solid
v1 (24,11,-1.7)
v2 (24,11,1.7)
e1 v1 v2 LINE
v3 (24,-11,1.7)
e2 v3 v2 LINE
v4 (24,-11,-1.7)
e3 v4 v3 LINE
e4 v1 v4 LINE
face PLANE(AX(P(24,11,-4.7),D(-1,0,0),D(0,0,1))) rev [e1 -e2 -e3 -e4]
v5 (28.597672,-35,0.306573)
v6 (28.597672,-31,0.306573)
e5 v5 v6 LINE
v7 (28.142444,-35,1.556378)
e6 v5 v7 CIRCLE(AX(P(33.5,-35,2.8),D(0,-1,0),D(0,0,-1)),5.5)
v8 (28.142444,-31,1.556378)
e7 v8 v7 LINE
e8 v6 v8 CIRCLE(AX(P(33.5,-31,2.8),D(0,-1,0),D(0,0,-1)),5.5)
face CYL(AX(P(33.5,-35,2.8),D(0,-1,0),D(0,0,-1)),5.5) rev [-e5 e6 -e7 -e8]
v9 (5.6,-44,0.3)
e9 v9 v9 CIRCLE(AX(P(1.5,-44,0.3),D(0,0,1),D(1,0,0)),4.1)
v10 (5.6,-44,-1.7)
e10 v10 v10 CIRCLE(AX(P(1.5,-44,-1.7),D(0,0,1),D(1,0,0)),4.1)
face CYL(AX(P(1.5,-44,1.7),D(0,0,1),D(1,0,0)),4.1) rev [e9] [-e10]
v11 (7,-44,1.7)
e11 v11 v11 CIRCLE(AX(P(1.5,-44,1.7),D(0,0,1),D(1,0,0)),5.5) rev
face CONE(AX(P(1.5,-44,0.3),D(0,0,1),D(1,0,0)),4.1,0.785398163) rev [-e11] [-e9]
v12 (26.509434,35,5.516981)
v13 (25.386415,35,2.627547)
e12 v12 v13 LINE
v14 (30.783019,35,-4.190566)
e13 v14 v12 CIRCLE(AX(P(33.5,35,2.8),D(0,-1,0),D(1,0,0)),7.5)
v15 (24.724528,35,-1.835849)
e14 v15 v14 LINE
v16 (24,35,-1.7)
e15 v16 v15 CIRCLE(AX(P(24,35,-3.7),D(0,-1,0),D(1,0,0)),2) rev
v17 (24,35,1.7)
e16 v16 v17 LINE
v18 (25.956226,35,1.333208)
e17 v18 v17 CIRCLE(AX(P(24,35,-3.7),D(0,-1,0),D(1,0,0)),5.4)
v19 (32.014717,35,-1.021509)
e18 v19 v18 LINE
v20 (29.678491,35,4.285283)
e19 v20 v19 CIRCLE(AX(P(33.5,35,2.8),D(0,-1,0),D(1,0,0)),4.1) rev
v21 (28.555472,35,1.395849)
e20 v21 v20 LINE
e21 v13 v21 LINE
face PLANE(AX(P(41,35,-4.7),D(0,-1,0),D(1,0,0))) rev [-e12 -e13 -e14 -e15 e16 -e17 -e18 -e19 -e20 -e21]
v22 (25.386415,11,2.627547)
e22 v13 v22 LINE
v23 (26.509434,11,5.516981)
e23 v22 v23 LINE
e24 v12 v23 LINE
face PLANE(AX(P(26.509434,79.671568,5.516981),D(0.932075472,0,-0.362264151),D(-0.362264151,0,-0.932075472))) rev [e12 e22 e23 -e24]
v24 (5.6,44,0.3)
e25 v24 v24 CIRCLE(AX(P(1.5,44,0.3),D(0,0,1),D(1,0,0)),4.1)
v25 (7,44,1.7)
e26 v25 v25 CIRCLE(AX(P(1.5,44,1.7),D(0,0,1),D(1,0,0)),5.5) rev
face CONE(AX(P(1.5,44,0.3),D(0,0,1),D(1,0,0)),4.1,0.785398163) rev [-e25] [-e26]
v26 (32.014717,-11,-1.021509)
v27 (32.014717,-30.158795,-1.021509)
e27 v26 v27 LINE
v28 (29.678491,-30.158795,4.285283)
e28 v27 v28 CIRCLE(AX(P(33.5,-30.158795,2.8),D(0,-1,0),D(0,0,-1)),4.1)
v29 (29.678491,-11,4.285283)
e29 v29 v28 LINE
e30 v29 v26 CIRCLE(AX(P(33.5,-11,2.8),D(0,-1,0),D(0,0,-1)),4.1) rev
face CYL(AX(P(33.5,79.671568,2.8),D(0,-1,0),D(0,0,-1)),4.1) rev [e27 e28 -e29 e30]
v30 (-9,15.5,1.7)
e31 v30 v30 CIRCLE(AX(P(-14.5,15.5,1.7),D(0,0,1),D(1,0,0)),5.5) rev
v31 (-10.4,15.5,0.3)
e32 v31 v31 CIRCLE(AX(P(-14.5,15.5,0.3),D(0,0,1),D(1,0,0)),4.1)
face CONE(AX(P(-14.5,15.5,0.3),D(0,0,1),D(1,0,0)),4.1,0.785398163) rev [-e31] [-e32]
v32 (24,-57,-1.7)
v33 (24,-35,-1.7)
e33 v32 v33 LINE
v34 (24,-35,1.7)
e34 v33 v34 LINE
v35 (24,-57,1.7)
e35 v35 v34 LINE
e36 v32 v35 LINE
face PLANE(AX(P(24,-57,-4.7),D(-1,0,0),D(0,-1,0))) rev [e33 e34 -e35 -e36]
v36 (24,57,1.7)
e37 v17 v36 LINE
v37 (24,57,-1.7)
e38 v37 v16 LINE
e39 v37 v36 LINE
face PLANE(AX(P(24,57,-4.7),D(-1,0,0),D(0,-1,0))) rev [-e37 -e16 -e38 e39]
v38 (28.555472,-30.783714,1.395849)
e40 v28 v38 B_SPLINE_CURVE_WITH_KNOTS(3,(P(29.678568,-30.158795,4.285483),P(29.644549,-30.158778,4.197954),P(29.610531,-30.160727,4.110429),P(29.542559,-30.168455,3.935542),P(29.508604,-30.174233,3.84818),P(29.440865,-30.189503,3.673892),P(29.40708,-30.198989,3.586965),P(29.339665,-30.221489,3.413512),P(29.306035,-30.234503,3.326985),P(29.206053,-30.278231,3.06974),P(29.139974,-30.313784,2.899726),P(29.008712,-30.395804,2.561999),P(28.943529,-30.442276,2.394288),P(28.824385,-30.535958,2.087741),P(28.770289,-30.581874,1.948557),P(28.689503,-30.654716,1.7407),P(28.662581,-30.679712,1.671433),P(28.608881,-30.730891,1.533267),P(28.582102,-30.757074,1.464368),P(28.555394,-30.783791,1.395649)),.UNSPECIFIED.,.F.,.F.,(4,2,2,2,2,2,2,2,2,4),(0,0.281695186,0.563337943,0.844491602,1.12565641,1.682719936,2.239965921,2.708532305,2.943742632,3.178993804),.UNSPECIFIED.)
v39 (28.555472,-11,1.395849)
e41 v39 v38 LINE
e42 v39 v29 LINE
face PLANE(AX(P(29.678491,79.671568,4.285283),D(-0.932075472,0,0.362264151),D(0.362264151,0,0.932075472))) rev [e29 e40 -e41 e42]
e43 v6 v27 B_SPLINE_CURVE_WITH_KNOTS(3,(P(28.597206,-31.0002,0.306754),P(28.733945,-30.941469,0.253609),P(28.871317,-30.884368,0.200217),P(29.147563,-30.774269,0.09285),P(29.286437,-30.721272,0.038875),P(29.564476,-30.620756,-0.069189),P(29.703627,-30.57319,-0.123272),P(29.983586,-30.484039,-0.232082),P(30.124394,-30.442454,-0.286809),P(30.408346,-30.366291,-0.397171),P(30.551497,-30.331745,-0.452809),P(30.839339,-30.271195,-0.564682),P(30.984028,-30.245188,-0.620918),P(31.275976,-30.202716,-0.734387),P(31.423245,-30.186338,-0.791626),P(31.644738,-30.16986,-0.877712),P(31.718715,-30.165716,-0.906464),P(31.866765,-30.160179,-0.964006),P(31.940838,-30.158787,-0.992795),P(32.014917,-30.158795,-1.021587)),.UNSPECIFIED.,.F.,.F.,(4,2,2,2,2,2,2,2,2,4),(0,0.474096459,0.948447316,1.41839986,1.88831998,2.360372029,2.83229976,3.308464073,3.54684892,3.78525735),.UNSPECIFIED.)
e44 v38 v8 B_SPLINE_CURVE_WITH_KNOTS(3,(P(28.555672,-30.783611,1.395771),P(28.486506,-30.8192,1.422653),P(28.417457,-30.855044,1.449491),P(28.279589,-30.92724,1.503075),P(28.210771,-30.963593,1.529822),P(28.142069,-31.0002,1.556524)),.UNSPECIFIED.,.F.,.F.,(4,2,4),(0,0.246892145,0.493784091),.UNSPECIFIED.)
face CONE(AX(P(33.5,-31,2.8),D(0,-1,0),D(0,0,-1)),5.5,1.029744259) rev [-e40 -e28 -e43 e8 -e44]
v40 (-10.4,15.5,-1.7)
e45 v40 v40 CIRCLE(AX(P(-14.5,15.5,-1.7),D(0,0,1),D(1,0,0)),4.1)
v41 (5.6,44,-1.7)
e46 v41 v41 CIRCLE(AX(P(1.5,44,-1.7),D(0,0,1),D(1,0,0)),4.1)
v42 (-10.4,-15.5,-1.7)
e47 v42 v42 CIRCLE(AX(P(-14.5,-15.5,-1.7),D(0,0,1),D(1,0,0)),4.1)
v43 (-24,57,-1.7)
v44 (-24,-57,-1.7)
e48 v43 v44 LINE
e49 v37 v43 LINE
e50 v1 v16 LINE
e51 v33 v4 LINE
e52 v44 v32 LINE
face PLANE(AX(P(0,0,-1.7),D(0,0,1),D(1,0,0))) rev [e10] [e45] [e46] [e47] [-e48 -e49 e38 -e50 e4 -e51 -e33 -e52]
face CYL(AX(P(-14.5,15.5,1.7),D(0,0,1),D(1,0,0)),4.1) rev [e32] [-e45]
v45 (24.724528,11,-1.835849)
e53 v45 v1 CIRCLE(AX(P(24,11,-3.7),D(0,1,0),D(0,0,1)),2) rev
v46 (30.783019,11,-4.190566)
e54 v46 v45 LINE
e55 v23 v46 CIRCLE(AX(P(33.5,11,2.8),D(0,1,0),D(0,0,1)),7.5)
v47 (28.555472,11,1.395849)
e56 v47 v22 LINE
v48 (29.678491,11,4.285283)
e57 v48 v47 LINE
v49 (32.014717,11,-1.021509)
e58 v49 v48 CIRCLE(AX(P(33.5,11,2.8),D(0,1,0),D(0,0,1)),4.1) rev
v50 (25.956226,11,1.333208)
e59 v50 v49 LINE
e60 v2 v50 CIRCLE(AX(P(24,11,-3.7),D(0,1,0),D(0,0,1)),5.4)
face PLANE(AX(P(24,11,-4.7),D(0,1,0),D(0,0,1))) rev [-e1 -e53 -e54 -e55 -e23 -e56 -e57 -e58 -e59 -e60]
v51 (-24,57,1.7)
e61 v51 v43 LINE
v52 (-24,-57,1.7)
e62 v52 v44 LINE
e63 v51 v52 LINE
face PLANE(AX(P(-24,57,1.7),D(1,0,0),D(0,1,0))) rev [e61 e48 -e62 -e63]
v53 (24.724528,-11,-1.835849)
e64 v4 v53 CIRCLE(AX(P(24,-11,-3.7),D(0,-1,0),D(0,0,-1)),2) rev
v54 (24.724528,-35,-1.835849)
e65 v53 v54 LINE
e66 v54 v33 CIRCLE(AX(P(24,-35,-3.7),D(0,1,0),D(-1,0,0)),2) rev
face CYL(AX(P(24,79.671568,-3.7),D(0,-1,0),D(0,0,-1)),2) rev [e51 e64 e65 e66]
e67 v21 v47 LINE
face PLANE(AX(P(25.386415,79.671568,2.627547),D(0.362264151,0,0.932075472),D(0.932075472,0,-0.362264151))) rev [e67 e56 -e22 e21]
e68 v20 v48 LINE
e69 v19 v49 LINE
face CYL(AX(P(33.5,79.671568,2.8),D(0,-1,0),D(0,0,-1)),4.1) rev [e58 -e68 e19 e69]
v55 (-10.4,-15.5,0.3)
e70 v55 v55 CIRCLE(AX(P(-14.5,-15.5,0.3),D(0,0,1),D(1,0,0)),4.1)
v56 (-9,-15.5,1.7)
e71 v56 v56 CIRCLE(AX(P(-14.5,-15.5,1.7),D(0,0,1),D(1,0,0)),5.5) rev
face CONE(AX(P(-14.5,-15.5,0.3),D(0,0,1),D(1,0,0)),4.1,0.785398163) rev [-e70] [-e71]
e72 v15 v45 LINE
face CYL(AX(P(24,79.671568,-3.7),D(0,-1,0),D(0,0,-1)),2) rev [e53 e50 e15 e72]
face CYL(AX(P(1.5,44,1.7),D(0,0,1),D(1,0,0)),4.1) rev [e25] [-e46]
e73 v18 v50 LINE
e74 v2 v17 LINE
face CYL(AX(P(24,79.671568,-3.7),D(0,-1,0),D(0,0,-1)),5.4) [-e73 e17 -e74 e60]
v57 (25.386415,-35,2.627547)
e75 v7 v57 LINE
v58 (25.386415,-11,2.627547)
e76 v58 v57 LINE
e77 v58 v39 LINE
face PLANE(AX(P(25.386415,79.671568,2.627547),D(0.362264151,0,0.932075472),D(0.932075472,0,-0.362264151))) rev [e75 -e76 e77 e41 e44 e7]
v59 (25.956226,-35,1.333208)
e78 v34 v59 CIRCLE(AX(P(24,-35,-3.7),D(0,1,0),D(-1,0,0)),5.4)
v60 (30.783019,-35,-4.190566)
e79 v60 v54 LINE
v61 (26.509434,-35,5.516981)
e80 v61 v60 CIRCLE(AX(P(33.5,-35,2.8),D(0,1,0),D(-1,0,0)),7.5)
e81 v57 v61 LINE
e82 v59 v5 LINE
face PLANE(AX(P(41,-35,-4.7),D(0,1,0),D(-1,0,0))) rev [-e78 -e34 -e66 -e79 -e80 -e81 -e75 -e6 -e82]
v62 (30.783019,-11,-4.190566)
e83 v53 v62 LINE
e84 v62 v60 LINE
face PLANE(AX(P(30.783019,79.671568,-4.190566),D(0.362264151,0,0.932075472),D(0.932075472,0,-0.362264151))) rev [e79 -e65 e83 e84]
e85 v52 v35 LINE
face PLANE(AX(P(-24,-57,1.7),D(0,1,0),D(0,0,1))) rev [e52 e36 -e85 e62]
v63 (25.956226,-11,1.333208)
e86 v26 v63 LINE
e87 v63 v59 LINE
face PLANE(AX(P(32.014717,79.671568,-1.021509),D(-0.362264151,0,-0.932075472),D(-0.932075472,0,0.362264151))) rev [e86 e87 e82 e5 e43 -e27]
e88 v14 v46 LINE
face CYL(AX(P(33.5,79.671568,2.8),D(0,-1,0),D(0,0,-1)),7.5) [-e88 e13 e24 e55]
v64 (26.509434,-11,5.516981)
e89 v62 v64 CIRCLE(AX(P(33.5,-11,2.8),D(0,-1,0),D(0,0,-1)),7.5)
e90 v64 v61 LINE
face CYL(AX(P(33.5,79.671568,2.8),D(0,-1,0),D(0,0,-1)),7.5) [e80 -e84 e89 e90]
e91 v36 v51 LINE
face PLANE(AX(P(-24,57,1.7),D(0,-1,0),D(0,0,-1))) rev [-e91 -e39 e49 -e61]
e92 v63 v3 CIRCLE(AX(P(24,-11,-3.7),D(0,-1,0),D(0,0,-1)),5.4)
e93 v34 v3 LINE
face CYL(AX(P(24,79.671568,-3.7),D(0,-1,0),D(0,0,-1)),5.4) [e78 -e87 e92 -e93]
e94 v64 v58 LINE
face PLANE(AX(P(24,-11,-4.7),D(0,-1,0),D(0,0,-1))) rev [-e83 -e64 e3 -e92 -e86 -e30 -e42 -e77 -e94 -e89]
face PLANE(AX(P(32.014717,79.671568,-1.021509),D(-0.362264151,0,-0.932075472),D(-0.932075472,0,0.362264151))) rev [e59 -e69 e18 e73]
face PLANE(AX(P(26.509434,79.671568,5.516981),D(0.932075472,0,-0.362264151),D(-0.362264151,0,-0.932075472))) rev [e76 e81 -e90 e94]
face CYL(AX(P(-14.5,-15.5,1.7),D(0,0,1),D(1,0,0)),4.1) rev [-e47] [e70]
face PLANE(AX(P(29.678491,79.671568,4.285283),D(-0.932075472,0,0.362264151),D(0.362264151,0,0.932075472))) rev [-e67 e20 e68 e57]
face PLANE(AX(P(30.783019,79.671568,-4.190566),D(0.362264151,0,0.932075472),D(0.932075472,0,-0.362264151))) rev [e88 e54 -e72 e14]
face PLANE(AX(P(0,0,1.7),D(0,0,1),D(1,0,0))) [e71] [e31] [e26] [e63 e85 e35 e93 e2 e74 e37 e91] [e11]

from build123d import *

# Parameters (mm, degrees)
BODYS_W                        = 48
BODYS_H                        = 114
BODY_DEPTH                     = 1.7
MIRROR1_START                  = -1.7
MIRROR1_OUTLINE_R              = 4.1
MIRROR1_DEPTH                  = 3.4
KNUCKLEBODY_REACH              = 63.87
KNUCKLEBODY_DIRECTION_2_REACH  = 63.87
KNUCKLECUT_DEPTH               = 71.965414111
KNUCKLECUT_DEPTH_BACK          = 71.965414111
KNUCKLECUTS_W                  = 17
KNUCKLECUTS_H                  = 22
HOLECHAMFER_SIZE               = 1.4
F_11_0_11_DIAMETER_HOLE2_D     = 11
F_11_0_11_DIAMETER_HOLE2_DEPTH = 4
F_11_0_11_DIAMETER_HOLE2_TIP   = 3.304733405


# Read off the part's stored shape, not the designer's step: Mirror1
with BuildPart() as part:
    # BodyS → Body (new, symmetric)
    with BuildSketch(Plane.XY):
        Rectangle(BODYS_W, BODYS_H)
    extrude(amount=BODY_DEPTH, both=True)

    # Mirror1 outline → Mirror1 (cut)
    with BuildSketch(Plane.XY.offset(MIRROR1_START)):
        with Locations((-14.5, 15.5)):
            Circle(MIRROR1_OUTLINE_R)
        with Locations((1.5, 44)):
            Circle(MIRROR1_OUTLINE_R)
        with Locations((-14.5, -15.5)):
            Circle(MIRROR1_OUTLINE_R)
        with Locations((1.5, -44)):
            Circle(MIRROR1_OUTLINE_R)
    extrude(amount=MIRROR1_DEPTH, mode=Mode.SUBTRACT)

    # KnuckleBody: up to this face of the body (flat: up to its plane)
    knucklebody_end = Plane(part.part.faces().sort_by_distance((0, 57, 0))[0])
    # KnuckleBodyS → KnuckleBody (add, up to the picked face)
    with BuildSketch(Plane(origin=(0, 0, 0), x_dir=(1, 0, 0), z_dir=(0, 1, 0)), mode=Mode.PRIVATE) as knucklebody_sk1:
        with BuildLine():
            Line((25.386415094, -2.62754717), (28.555471698, -1.395849057))
            Line((28.555471698, -1.395849057), (29.678490566, -4.285283019))
            ThreePointArc((29.678490566, -4.285283019), (37.25246893, -4.451961541), (32.014716981, 1.021509434))
            Line((32.014716981, 1.021509434), (25.956226415, -1.333207547))
            ThreePointArc((25.956226415, -1.333207547), (24.995158089, -1.607509809), (24, -1.7))
            Line((24, -1.7), (24, 1.7))
            ThreePointArc((24, 1.7), (24.36857707, 1.734255626), (24.724528302, 1.835849057))
            Line((24.724528302, 1.835849057), (30.783018868, 4.190566038))
            ThreePointArc((30.783018868, 4.190566038), (40.364272432, -5.821880867), (26.509433962, -5.516981132))
            Line((26.509433962, -5.516981132), (25.386415094, -2.62754717))
        make_face()
    knucklebody_tool1 = split(extrude(knucklebody_sk1.sketch, amount=KNUCKLEBODY_REACH, mode=Mode.PRIVATE), bisect_by=knucklebody_end, keep=Keep.BOTH, mode=Mode.PRIVATE)
    add(knucklebody_tool1.solids().sort_by(Axis((26.159241, 0, 3.990133), (0, 1, 0)))[0])

    # KnuckleBody direction 2: up to this face of the body (flat: up to its plane)
    knucklebody_direction_2_end = Plane(part.part.faces().sort_by_distance((0, -57, 0))[0])
    # KnuckleBodyS → KnuckleBody direction 2 (add, up to the picked face)
    with BuildSketch(Plane(origin=(0, 0, 0), x_dir=(1, 0, 0), z_dir=(0, 1, 0)), mode=Mode.PRIVATE) as knucklebody_direction_2_sk1:
        with BuildLine():
            Line((25.386415094, -2.62754717), (28.555471698, -1.395849057))
            Line((28.555471698, -1.395849057), (29.678490566, -4.285283019))
            ThreePointArc((29.678490566, -4.285283019), (37.25246893, -4.451961541), (32.014716981, 1.021509434))
            Line((32.014716981, 1.021509434), (25.956226415, -1.333207547))
            ThreePointArc((25.956226415, -1.333207547), (24.995158089, -1.607509809), (24, -1.7))
            Line((24, -1.7), (24, 1.7))
            ThreePointArc((24, 1.7), (24.36857707, 1.734255626), (24.724528302, 1.835849057))
            Line((24.724528302, 1.835849057), (30.783018868, 4.190566038))
            ThreePointArc((30.783018868, 4.190566038), (40.364272432, -5.821880867), (26.509433962, -5.516981132))
            Line((26.509433962, -5.516981132), (25.386415094, -2.62754717))
        make_face()
    knucklebody_direction_2_tool1 = split(extrude(knucklebody_direction_2_sk1.sketch, amount=-KNUCKLEBODY_DIRECTION_2_REACH, mode=Mode.PRIVATE), bisect_by=knucklebody_direction_2_end, keep=Keep.BOTH, mode=Mode.PRIVATE)
    add(knucklebody_direction_2_tool1.solids().sort_by(Axis((26.159241, 0, 3.990133), (0, -1, 0)))[0])

    # KnuckleCutS → KnuckleCut (cut, two sides: drawn at the far end of the back side and taken through both)
    with BuildSketch(Plane.XY.offset(-KNUCKLECUT_DEPTH_BACK)):
        with Locations((32.5, 46)):
            Rectangle(KNUCKLECUTS_W, KNUCKLECUTS_H)
        with Locations((32.5, -46)):
            Rectangle(KNUCKLECUTS_W, KNUCKLECUTS_H)
        with Locations((32.5, 0)):
            Rectangle(KNUCKLECUTS_W, KNUCKLECUTS_H)
    extrude(amount=KNUCKLECUT_DEPTH + KNUCKLECUT_DEPTH_BACK, mode=Mode.SUBTRACT)

    # HoleChamfer
    holechamfer_edges = [part.edges().sort_by_distance(p)[0] for p in [
        (-18.6, 15.5, 1.7),
        (-2.6, 44, 1.7),
        (-18.6, -15.5, 1.7),
        (-2.6, -44, 1.7),
    ]]
    chamfer(holechamfer_edges, length=HOLECHAMFER_SIZE)

    # Ø11.0 (11) Diameter Hole2
    with Locations(Plane(origin=(0, -35, 0), x_dir=(-1, 0, 0), z_dir=(0, -1, 0))):
        with Locations((-33.5, -2.8)):
            Hole(F_11_0_11_DIAMETER_HOLE2_D / 2, depth=F_11_0_11_DIAMETER_HOLE2_DEPTH)
            with Locations((0, 0, -(F_11_0_11_DIAMETER_HOLE2_DEPTH + F_11_0_11_DIAMETER_HOLE2_TIP / 2))):  # 118° drill point
                Cone(0, F_11_0_11_DIAMETER_HOLE2_D / 2, F_11_0_11_DIAMETER_HOLE2_TIP, mode=Mode.SUBTRACT)


solid = part.part
